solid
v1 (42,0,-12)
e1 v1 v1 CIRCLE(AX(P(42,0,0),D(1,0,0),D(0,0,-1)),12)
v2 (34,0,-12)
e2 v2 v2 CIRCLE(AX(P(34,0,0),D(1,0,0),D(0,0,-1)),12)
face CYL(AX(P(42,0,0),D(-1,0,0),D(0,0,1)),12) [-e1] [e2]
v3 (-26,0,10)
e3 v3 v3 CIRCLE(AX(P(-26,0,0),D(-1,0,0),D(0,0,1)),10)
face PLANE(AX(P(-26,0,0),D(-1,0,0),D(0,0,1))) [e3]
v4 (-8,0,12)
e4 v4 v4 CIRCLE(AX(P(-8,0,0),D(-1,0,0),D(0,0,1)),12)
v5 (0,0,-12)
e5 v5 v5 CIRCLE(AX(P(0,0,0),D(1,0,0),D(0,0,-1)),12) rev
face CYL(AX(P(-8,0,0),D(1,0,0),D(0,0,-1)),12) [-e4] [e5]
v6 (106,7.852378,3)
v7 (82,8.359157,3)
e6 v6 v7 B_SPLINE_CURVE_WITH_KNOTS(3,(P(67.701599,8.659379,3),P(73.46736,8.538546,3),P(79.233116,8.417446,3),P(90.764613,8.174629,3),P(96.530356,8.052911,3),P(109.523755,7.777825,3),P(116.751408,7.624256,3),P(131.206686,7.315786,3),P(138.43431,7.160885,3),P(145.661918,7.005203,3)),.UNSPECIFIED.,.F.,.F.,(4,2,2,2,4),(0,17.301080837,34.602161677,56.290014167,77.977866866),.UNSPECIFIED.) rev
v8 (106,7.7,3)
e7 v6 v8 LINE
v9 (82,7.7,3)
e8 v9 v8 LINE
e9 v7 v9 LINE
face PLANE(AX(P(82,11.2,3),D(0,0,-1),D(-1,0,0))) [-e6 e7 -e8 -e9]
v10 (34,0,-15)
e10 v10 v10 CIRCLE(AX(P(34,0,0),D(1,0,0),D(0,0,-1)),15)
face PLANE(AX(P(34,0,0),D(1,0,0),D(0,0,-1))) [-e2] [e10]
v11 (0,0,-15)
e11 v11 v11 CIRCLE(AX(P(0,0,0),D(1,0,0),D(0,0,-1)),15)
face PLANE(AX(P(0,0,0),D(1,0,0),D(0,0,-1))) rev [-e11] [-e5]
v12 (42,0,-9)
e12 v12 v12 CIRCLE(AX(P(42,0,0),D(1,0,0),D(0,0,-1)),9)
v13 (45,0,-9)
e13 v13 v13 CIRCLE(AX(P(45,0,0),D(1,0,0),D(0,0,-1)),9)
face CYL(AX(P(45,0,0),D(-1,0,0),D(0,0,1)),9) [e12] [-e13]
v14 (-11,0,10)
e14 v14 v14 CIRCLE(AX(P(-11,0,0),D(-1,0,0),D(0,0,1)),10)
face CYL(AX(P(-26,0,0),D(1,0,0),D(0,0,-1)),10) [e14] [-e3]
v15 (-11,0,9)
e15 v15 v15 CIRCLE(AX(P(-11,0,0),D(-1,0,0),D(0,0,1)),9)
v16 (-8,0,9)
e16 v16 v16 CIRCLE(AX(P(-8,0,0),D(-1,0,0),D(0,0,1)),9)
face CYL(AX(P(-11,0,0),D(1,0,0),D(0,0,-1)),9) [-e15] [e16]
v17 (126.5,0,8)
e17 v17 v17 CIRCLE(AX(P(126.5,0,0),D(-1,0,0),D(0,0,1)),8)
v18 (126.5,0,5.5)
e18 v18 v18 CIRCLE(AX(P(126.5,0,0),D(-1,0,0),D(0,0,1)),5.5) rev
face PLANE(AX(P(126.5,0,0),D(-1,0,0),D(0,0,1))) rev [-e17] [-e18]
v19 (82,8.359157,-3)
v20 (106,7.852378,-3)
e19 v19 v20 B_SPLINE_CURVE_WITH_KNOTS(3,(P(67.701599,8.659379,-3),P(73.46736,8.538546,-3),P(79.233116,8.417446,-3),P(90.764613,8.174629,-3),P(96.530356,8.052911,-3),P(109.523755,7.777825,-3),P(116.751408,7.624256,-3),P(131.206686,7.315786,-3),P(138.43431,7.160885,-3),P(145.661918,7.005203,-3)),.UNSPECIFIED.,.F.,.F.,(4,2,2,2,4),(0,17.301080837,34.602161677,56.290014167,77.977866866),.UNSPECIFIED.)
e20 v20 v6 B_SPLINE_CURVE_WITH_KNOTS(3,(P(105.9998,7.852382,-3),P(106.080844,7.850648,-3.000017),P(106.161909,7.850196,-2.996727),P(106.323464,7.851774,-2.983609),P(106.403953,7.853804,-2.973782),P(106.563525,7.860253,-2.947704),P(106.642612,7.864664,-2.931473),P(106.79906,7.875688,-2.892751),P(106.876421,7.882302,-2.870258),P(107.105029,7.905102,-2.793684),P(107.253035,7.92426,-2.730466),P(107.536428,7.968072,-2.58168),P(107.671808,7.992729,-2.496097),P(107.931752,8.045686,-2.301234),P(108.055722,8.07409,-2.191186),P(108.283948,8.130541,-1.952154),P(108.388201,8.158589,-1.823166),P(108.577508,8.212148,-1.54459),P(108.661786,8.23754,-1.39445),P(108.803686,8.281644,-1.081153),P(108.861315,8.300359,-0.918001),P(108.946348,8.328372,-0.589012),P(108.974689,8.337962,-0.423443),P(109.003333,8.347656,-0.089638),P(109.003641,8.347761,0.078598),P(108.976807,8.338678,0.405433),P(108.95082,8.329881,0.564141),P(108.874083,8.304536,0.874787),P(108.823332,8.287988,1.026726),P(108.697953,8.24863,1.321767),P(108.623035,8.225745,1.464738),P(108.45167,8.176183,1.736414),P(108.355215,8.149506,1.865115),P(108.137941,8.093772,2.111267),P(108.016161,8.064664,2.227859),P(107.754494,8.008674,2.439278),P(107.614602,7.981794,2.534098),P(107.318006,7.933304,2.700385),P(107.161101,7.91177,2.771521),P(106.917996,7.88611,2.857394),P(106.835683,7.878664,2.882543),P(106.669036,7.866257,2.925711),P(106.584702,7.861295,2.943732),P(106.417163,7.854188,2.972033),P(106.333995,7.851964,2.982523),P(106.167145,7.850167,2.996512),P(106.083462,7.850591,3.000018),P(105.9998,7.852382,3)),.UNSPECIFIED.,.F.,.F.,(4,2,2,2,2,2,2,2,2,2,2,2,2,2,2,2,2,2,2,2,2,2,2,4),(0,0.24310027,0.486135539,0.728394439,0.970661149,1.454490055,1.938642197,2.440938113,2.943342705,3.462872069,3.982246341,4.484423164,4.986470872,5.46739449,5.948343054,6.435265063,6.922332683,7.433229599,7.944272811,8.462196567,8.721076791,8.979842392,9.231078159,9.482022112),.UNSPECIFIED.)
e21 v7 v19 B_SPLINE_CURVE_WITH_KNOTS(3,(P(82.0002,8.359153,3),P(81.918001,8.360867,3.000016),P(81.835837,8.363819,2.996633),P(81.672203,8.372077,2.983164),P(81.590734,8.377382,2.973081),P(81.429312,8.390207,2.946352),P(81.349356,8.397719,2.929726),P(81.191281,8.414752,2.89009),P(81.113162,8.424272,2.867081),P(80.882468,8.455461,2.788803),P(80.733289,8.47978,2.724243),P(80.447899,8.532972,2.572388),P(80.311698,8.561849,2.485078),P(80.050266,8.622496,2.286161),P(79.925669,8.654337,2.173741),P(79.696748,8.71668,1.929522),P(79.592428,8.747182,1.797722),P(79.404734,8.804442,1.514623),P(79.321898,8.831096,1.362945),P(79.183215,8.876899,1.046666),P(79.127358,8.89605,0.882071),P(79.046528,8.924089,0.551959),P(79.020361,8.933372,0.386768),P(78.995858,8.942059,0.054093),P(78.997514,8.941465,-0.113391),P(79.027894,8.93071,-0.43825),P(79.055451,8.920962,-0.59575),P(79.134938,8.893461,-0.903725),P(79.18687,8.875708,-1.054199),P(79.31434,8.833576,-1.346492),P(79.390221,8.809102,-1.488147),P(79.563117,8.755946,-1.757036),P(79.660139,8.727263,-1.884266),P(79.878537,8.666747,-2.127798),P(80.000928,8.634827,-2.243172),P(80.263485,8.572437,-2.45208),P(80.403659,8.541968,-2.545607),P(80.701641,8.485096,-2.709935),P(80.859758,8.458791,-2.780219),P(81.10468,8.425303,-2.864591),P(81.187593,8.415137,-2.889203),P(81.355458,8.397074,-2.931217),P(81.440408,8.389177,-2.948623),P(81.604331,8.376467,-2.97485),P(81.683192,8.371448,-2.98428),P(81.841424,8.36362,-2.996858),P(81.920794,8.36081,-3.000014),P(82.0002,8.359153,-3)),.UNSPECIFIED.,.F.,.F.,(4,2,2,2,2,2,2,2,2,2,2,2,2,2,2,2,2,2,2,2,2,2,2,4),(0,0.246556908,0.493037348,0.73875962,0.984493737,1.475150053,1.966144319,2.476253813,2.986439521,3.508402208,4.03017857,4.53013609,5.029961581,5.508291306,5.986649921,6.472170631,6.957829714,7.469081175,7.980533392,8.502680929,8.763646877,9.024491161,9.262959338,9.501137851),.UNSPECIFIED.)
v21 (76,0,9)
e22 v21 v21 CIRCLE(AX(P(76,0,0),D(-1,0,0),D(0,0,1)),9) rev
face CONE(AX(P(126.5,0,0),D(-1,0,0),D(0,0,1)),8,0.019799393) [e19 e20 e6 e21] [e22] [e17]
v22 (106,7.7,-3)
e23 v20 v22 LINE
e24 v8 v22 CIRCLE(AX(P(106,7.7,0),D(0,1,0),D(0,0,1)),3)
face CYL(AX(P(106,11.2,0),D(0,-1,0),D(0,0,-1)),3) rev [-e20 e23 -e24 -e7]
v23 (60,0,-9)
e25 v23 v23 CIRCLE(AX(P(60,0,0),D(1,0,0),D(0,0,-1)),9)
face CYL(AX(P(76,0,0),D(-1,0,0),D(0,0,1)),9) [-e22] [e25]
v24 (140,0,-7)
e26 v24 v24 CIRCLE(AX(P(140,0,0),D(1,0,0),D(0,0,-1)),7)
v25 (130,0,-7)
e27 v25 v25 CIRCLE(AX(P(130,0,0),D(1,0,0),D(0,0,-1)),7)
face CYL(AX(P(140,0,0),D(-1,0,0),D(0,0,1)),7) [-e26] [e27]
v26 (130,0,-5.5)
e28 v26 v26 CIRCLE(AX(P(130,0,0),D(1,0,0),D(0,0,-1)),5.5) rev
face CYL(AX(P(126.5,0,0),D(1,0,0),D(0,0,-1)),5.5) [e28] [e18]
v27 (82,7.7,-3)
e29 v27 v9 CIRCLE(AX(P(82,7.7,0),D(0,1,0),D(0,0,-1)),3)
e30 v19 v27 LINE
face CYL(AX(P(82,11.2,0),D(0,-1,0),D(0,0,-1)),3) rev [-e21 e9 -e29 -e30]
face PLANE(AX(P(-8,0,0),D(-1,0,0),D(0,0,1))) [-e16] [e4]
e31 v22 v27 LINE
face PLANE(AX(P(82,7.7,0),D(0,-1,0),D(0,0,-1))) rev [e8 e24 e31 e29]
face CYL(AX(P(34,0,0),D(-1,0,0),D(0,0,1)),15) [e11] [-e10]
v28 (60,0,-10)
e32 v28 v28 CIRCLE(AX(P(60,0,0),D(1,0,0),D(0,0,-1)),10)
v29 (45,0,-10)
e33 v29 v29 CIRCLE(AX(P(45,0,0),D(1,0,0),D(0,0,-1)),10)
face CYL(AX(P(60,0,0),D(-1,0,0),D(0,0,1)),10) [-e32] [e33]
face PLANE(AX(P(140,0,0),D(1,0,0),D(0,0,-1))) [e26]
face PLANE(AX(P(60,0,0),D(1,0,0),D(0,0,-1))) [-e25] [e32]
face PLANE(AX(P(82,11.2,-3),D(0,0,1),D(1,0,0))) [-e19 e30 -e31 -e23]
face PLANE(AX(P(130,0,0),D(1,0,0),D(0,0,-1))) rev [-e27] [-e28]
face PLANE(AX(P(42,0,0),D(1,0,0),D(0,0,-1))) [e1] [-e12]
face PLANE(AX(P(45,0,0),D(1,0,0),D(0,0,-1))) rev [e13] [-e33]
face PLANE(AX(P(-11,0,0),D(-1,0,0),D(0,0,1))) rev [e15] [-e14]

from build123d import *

# Parameters (mm, degrees)
SKETCH_1_R          = 15
EXTRUDE_1_DEPTH     = 34
SKETCH_2_R          = 12
EXTRUDE_2_DEPTH     = 8
SKETCH_3_R          = 9
EXTRUDE_3_DEPTH     = 3
SKETCH_4_R          = 10
EXTRUDE_4_DEPTH     = 15
SKETCH_5_R          = 9
EXTRUDE_5_DEPTH     = 16
EXTRUDE_START       = 8
SKETCH_6_R          = 12
EXTRUDE_6_DEPTH     = 8
EXTRUDE_START_2     = 3
SKETCH_7_R          = 9
EXTRUDE_7_DEPTH     = 3
EXTRUDE_START_3     = 15
SKETCH_8_R          = 10
EXTRUDE_8_DEPTH     = 15
SKETCH_9_R          = 7
EXTRUDE_9_DEPTH     = 10
SKETCH_10_R         = 5.5
EXTRUDE_10_DEPTH    = 3.5
CUT_EXTRUDE_START   = 7.7
CUT_EXTRUDE_1_DEPTH = 3.5


# Read off the part's stored shape, not the designer's step: 放样1
with BuildPart() as part:
    # 草图1 → 凸台-拉伸1 (new body)
    with BuildSketch(Plane(origin=(0, 0, 0), x_dir=(0, 0, -1), z_dir=(1, 0, 0))):
        Circle(SKETCH_1_R)
    extrude(amount=EXTRUDE_1_DEPTH)

    # 草图2 → 凸台-拉伸2 (add)
    with BuildSketch(Plane(origin=(34, 0, 0), x_dir=(0, 0, -1), z_dir=(1, 0, 0))):
        Circle(SKETCH_2_R)
    extrude(amount=EXTRUDE_2_DEPTH)

    # 草图3 → 凸台-拉伸3 (add)
    with BuildSketch(Plane(origin=(42, 0, 0), x_dir=(0, 0, -1), z_dir=(1, 0, 0))):
        Circle(SKETCH_3_R)
    extrude(amount=EXTRUDE_3_DEPTH)

    # 草图4 → 凸台-拉伸4 (add)
    with BuildSketch(Plane(origin=(45, 0, 0), x_dir=(0, 0, -1), z_dir=(1, 0, 0))):
        Circle(SKETCH_4_R)
    extrude(amount=EXTRUDE_4_DEPTH)

    # 草图5 → 凸台-拉伸5 (add)
    with BuildSketch(Plane(origin=(60, 0, 0), x_dir=(0, 0, -1), z_dir=(1, 0, 0))):
        Circle(SKETCH_5_R)
    extrude(amount=EXTRUDE_5_DEPTH)

    # 草图6 → 凸台-拉伸6 (add)
    with BuildSketch(Plane.ZY.offset(EXTRUDE_START)):
        with Locations(Location((0, 0, 0), (0, 0, 180))):
            Circle(SKETCH_6_R)
    extrude(amount=-EXTRUDE_6_DEPTH)

    # 草图7 → 凸台-拉伸7 (add)
    with BuildSketch(Plane.ZY.offset(8).offset(EXTRUDE_START_2)):
        with Locations(Location((0, 0, 0), (0, 0, 180))):
            Circle(SKETCH_7_R)
    extrude(amount=-EXTRUDE_7_DEPTH)

    # 草图8 → 凸台-拉伸8 (add)
    with BuildSketch(Plane.ZY.offset(11).offset(EXTRUDE_START_3)):
        with Locations(Location((0, 0, 0), (0, 0, 180))):
            Circle(SKETCH_8_R)
    extrude(amount=-EXTRUDE_8_DEPTH)



with BuildPart() as body_2:
    # 草图9 → 凸台-拉伸9 (new body)
    with BuildSketch(Plane(origin=(130, 0, 0), x_dir=(0, 0, -1), z_dir=(1, 0, 0))):
        Circle(SKETCH_9_R)
    extrude(amount=EXTRUDE_9_DEPTH)

    # 草图10 → 凸台-拉伸10 (add)
    with BuildSketch(Plane.ZY.offset(-130)):
        with Locations(Location((0, 0, 0), (0, 0, 180))):
            Circle(SKETCH_10_R)
    extrude(amount=EXTRUDE_10_DEPTH)


with BuildPart() as part_1:
    add(part.part)

    add(body_2.part)  # 放样1 merges body 2
    # 放样1 outline → 放样1 (revolve)
    with BuildSketch(Plane.YX):
        Polygon((8, 126.5), (0, 126.5), (0, 76), (9, 76), align=None)
    revolve(axis=Axis((0, 0, 0), (1, 0, 0)))

    # 草图12 → 切除-拉伸1 (cut)
    with BuildSketch(Plane(origin=(0, 0, 0), x_dir=(1, 0, 0), z_dir=(0, 1, 0)).offset(CUT_EXTRUDE_START)):
        with BuildLine():
            Line((82, -3), (106, -3))
            ThreePointArc((106, -3), (109, 0), (106, 3))
            Line((106, 3), (82, 3))
            ThreePointArc((82, 3), (79, 0), (82, -3))
        make_face()
    extrude(amount=CUT_EXTRUDE_1_DEPTH, mode=Mode.SUBTRACT)


solid = part_1.part
